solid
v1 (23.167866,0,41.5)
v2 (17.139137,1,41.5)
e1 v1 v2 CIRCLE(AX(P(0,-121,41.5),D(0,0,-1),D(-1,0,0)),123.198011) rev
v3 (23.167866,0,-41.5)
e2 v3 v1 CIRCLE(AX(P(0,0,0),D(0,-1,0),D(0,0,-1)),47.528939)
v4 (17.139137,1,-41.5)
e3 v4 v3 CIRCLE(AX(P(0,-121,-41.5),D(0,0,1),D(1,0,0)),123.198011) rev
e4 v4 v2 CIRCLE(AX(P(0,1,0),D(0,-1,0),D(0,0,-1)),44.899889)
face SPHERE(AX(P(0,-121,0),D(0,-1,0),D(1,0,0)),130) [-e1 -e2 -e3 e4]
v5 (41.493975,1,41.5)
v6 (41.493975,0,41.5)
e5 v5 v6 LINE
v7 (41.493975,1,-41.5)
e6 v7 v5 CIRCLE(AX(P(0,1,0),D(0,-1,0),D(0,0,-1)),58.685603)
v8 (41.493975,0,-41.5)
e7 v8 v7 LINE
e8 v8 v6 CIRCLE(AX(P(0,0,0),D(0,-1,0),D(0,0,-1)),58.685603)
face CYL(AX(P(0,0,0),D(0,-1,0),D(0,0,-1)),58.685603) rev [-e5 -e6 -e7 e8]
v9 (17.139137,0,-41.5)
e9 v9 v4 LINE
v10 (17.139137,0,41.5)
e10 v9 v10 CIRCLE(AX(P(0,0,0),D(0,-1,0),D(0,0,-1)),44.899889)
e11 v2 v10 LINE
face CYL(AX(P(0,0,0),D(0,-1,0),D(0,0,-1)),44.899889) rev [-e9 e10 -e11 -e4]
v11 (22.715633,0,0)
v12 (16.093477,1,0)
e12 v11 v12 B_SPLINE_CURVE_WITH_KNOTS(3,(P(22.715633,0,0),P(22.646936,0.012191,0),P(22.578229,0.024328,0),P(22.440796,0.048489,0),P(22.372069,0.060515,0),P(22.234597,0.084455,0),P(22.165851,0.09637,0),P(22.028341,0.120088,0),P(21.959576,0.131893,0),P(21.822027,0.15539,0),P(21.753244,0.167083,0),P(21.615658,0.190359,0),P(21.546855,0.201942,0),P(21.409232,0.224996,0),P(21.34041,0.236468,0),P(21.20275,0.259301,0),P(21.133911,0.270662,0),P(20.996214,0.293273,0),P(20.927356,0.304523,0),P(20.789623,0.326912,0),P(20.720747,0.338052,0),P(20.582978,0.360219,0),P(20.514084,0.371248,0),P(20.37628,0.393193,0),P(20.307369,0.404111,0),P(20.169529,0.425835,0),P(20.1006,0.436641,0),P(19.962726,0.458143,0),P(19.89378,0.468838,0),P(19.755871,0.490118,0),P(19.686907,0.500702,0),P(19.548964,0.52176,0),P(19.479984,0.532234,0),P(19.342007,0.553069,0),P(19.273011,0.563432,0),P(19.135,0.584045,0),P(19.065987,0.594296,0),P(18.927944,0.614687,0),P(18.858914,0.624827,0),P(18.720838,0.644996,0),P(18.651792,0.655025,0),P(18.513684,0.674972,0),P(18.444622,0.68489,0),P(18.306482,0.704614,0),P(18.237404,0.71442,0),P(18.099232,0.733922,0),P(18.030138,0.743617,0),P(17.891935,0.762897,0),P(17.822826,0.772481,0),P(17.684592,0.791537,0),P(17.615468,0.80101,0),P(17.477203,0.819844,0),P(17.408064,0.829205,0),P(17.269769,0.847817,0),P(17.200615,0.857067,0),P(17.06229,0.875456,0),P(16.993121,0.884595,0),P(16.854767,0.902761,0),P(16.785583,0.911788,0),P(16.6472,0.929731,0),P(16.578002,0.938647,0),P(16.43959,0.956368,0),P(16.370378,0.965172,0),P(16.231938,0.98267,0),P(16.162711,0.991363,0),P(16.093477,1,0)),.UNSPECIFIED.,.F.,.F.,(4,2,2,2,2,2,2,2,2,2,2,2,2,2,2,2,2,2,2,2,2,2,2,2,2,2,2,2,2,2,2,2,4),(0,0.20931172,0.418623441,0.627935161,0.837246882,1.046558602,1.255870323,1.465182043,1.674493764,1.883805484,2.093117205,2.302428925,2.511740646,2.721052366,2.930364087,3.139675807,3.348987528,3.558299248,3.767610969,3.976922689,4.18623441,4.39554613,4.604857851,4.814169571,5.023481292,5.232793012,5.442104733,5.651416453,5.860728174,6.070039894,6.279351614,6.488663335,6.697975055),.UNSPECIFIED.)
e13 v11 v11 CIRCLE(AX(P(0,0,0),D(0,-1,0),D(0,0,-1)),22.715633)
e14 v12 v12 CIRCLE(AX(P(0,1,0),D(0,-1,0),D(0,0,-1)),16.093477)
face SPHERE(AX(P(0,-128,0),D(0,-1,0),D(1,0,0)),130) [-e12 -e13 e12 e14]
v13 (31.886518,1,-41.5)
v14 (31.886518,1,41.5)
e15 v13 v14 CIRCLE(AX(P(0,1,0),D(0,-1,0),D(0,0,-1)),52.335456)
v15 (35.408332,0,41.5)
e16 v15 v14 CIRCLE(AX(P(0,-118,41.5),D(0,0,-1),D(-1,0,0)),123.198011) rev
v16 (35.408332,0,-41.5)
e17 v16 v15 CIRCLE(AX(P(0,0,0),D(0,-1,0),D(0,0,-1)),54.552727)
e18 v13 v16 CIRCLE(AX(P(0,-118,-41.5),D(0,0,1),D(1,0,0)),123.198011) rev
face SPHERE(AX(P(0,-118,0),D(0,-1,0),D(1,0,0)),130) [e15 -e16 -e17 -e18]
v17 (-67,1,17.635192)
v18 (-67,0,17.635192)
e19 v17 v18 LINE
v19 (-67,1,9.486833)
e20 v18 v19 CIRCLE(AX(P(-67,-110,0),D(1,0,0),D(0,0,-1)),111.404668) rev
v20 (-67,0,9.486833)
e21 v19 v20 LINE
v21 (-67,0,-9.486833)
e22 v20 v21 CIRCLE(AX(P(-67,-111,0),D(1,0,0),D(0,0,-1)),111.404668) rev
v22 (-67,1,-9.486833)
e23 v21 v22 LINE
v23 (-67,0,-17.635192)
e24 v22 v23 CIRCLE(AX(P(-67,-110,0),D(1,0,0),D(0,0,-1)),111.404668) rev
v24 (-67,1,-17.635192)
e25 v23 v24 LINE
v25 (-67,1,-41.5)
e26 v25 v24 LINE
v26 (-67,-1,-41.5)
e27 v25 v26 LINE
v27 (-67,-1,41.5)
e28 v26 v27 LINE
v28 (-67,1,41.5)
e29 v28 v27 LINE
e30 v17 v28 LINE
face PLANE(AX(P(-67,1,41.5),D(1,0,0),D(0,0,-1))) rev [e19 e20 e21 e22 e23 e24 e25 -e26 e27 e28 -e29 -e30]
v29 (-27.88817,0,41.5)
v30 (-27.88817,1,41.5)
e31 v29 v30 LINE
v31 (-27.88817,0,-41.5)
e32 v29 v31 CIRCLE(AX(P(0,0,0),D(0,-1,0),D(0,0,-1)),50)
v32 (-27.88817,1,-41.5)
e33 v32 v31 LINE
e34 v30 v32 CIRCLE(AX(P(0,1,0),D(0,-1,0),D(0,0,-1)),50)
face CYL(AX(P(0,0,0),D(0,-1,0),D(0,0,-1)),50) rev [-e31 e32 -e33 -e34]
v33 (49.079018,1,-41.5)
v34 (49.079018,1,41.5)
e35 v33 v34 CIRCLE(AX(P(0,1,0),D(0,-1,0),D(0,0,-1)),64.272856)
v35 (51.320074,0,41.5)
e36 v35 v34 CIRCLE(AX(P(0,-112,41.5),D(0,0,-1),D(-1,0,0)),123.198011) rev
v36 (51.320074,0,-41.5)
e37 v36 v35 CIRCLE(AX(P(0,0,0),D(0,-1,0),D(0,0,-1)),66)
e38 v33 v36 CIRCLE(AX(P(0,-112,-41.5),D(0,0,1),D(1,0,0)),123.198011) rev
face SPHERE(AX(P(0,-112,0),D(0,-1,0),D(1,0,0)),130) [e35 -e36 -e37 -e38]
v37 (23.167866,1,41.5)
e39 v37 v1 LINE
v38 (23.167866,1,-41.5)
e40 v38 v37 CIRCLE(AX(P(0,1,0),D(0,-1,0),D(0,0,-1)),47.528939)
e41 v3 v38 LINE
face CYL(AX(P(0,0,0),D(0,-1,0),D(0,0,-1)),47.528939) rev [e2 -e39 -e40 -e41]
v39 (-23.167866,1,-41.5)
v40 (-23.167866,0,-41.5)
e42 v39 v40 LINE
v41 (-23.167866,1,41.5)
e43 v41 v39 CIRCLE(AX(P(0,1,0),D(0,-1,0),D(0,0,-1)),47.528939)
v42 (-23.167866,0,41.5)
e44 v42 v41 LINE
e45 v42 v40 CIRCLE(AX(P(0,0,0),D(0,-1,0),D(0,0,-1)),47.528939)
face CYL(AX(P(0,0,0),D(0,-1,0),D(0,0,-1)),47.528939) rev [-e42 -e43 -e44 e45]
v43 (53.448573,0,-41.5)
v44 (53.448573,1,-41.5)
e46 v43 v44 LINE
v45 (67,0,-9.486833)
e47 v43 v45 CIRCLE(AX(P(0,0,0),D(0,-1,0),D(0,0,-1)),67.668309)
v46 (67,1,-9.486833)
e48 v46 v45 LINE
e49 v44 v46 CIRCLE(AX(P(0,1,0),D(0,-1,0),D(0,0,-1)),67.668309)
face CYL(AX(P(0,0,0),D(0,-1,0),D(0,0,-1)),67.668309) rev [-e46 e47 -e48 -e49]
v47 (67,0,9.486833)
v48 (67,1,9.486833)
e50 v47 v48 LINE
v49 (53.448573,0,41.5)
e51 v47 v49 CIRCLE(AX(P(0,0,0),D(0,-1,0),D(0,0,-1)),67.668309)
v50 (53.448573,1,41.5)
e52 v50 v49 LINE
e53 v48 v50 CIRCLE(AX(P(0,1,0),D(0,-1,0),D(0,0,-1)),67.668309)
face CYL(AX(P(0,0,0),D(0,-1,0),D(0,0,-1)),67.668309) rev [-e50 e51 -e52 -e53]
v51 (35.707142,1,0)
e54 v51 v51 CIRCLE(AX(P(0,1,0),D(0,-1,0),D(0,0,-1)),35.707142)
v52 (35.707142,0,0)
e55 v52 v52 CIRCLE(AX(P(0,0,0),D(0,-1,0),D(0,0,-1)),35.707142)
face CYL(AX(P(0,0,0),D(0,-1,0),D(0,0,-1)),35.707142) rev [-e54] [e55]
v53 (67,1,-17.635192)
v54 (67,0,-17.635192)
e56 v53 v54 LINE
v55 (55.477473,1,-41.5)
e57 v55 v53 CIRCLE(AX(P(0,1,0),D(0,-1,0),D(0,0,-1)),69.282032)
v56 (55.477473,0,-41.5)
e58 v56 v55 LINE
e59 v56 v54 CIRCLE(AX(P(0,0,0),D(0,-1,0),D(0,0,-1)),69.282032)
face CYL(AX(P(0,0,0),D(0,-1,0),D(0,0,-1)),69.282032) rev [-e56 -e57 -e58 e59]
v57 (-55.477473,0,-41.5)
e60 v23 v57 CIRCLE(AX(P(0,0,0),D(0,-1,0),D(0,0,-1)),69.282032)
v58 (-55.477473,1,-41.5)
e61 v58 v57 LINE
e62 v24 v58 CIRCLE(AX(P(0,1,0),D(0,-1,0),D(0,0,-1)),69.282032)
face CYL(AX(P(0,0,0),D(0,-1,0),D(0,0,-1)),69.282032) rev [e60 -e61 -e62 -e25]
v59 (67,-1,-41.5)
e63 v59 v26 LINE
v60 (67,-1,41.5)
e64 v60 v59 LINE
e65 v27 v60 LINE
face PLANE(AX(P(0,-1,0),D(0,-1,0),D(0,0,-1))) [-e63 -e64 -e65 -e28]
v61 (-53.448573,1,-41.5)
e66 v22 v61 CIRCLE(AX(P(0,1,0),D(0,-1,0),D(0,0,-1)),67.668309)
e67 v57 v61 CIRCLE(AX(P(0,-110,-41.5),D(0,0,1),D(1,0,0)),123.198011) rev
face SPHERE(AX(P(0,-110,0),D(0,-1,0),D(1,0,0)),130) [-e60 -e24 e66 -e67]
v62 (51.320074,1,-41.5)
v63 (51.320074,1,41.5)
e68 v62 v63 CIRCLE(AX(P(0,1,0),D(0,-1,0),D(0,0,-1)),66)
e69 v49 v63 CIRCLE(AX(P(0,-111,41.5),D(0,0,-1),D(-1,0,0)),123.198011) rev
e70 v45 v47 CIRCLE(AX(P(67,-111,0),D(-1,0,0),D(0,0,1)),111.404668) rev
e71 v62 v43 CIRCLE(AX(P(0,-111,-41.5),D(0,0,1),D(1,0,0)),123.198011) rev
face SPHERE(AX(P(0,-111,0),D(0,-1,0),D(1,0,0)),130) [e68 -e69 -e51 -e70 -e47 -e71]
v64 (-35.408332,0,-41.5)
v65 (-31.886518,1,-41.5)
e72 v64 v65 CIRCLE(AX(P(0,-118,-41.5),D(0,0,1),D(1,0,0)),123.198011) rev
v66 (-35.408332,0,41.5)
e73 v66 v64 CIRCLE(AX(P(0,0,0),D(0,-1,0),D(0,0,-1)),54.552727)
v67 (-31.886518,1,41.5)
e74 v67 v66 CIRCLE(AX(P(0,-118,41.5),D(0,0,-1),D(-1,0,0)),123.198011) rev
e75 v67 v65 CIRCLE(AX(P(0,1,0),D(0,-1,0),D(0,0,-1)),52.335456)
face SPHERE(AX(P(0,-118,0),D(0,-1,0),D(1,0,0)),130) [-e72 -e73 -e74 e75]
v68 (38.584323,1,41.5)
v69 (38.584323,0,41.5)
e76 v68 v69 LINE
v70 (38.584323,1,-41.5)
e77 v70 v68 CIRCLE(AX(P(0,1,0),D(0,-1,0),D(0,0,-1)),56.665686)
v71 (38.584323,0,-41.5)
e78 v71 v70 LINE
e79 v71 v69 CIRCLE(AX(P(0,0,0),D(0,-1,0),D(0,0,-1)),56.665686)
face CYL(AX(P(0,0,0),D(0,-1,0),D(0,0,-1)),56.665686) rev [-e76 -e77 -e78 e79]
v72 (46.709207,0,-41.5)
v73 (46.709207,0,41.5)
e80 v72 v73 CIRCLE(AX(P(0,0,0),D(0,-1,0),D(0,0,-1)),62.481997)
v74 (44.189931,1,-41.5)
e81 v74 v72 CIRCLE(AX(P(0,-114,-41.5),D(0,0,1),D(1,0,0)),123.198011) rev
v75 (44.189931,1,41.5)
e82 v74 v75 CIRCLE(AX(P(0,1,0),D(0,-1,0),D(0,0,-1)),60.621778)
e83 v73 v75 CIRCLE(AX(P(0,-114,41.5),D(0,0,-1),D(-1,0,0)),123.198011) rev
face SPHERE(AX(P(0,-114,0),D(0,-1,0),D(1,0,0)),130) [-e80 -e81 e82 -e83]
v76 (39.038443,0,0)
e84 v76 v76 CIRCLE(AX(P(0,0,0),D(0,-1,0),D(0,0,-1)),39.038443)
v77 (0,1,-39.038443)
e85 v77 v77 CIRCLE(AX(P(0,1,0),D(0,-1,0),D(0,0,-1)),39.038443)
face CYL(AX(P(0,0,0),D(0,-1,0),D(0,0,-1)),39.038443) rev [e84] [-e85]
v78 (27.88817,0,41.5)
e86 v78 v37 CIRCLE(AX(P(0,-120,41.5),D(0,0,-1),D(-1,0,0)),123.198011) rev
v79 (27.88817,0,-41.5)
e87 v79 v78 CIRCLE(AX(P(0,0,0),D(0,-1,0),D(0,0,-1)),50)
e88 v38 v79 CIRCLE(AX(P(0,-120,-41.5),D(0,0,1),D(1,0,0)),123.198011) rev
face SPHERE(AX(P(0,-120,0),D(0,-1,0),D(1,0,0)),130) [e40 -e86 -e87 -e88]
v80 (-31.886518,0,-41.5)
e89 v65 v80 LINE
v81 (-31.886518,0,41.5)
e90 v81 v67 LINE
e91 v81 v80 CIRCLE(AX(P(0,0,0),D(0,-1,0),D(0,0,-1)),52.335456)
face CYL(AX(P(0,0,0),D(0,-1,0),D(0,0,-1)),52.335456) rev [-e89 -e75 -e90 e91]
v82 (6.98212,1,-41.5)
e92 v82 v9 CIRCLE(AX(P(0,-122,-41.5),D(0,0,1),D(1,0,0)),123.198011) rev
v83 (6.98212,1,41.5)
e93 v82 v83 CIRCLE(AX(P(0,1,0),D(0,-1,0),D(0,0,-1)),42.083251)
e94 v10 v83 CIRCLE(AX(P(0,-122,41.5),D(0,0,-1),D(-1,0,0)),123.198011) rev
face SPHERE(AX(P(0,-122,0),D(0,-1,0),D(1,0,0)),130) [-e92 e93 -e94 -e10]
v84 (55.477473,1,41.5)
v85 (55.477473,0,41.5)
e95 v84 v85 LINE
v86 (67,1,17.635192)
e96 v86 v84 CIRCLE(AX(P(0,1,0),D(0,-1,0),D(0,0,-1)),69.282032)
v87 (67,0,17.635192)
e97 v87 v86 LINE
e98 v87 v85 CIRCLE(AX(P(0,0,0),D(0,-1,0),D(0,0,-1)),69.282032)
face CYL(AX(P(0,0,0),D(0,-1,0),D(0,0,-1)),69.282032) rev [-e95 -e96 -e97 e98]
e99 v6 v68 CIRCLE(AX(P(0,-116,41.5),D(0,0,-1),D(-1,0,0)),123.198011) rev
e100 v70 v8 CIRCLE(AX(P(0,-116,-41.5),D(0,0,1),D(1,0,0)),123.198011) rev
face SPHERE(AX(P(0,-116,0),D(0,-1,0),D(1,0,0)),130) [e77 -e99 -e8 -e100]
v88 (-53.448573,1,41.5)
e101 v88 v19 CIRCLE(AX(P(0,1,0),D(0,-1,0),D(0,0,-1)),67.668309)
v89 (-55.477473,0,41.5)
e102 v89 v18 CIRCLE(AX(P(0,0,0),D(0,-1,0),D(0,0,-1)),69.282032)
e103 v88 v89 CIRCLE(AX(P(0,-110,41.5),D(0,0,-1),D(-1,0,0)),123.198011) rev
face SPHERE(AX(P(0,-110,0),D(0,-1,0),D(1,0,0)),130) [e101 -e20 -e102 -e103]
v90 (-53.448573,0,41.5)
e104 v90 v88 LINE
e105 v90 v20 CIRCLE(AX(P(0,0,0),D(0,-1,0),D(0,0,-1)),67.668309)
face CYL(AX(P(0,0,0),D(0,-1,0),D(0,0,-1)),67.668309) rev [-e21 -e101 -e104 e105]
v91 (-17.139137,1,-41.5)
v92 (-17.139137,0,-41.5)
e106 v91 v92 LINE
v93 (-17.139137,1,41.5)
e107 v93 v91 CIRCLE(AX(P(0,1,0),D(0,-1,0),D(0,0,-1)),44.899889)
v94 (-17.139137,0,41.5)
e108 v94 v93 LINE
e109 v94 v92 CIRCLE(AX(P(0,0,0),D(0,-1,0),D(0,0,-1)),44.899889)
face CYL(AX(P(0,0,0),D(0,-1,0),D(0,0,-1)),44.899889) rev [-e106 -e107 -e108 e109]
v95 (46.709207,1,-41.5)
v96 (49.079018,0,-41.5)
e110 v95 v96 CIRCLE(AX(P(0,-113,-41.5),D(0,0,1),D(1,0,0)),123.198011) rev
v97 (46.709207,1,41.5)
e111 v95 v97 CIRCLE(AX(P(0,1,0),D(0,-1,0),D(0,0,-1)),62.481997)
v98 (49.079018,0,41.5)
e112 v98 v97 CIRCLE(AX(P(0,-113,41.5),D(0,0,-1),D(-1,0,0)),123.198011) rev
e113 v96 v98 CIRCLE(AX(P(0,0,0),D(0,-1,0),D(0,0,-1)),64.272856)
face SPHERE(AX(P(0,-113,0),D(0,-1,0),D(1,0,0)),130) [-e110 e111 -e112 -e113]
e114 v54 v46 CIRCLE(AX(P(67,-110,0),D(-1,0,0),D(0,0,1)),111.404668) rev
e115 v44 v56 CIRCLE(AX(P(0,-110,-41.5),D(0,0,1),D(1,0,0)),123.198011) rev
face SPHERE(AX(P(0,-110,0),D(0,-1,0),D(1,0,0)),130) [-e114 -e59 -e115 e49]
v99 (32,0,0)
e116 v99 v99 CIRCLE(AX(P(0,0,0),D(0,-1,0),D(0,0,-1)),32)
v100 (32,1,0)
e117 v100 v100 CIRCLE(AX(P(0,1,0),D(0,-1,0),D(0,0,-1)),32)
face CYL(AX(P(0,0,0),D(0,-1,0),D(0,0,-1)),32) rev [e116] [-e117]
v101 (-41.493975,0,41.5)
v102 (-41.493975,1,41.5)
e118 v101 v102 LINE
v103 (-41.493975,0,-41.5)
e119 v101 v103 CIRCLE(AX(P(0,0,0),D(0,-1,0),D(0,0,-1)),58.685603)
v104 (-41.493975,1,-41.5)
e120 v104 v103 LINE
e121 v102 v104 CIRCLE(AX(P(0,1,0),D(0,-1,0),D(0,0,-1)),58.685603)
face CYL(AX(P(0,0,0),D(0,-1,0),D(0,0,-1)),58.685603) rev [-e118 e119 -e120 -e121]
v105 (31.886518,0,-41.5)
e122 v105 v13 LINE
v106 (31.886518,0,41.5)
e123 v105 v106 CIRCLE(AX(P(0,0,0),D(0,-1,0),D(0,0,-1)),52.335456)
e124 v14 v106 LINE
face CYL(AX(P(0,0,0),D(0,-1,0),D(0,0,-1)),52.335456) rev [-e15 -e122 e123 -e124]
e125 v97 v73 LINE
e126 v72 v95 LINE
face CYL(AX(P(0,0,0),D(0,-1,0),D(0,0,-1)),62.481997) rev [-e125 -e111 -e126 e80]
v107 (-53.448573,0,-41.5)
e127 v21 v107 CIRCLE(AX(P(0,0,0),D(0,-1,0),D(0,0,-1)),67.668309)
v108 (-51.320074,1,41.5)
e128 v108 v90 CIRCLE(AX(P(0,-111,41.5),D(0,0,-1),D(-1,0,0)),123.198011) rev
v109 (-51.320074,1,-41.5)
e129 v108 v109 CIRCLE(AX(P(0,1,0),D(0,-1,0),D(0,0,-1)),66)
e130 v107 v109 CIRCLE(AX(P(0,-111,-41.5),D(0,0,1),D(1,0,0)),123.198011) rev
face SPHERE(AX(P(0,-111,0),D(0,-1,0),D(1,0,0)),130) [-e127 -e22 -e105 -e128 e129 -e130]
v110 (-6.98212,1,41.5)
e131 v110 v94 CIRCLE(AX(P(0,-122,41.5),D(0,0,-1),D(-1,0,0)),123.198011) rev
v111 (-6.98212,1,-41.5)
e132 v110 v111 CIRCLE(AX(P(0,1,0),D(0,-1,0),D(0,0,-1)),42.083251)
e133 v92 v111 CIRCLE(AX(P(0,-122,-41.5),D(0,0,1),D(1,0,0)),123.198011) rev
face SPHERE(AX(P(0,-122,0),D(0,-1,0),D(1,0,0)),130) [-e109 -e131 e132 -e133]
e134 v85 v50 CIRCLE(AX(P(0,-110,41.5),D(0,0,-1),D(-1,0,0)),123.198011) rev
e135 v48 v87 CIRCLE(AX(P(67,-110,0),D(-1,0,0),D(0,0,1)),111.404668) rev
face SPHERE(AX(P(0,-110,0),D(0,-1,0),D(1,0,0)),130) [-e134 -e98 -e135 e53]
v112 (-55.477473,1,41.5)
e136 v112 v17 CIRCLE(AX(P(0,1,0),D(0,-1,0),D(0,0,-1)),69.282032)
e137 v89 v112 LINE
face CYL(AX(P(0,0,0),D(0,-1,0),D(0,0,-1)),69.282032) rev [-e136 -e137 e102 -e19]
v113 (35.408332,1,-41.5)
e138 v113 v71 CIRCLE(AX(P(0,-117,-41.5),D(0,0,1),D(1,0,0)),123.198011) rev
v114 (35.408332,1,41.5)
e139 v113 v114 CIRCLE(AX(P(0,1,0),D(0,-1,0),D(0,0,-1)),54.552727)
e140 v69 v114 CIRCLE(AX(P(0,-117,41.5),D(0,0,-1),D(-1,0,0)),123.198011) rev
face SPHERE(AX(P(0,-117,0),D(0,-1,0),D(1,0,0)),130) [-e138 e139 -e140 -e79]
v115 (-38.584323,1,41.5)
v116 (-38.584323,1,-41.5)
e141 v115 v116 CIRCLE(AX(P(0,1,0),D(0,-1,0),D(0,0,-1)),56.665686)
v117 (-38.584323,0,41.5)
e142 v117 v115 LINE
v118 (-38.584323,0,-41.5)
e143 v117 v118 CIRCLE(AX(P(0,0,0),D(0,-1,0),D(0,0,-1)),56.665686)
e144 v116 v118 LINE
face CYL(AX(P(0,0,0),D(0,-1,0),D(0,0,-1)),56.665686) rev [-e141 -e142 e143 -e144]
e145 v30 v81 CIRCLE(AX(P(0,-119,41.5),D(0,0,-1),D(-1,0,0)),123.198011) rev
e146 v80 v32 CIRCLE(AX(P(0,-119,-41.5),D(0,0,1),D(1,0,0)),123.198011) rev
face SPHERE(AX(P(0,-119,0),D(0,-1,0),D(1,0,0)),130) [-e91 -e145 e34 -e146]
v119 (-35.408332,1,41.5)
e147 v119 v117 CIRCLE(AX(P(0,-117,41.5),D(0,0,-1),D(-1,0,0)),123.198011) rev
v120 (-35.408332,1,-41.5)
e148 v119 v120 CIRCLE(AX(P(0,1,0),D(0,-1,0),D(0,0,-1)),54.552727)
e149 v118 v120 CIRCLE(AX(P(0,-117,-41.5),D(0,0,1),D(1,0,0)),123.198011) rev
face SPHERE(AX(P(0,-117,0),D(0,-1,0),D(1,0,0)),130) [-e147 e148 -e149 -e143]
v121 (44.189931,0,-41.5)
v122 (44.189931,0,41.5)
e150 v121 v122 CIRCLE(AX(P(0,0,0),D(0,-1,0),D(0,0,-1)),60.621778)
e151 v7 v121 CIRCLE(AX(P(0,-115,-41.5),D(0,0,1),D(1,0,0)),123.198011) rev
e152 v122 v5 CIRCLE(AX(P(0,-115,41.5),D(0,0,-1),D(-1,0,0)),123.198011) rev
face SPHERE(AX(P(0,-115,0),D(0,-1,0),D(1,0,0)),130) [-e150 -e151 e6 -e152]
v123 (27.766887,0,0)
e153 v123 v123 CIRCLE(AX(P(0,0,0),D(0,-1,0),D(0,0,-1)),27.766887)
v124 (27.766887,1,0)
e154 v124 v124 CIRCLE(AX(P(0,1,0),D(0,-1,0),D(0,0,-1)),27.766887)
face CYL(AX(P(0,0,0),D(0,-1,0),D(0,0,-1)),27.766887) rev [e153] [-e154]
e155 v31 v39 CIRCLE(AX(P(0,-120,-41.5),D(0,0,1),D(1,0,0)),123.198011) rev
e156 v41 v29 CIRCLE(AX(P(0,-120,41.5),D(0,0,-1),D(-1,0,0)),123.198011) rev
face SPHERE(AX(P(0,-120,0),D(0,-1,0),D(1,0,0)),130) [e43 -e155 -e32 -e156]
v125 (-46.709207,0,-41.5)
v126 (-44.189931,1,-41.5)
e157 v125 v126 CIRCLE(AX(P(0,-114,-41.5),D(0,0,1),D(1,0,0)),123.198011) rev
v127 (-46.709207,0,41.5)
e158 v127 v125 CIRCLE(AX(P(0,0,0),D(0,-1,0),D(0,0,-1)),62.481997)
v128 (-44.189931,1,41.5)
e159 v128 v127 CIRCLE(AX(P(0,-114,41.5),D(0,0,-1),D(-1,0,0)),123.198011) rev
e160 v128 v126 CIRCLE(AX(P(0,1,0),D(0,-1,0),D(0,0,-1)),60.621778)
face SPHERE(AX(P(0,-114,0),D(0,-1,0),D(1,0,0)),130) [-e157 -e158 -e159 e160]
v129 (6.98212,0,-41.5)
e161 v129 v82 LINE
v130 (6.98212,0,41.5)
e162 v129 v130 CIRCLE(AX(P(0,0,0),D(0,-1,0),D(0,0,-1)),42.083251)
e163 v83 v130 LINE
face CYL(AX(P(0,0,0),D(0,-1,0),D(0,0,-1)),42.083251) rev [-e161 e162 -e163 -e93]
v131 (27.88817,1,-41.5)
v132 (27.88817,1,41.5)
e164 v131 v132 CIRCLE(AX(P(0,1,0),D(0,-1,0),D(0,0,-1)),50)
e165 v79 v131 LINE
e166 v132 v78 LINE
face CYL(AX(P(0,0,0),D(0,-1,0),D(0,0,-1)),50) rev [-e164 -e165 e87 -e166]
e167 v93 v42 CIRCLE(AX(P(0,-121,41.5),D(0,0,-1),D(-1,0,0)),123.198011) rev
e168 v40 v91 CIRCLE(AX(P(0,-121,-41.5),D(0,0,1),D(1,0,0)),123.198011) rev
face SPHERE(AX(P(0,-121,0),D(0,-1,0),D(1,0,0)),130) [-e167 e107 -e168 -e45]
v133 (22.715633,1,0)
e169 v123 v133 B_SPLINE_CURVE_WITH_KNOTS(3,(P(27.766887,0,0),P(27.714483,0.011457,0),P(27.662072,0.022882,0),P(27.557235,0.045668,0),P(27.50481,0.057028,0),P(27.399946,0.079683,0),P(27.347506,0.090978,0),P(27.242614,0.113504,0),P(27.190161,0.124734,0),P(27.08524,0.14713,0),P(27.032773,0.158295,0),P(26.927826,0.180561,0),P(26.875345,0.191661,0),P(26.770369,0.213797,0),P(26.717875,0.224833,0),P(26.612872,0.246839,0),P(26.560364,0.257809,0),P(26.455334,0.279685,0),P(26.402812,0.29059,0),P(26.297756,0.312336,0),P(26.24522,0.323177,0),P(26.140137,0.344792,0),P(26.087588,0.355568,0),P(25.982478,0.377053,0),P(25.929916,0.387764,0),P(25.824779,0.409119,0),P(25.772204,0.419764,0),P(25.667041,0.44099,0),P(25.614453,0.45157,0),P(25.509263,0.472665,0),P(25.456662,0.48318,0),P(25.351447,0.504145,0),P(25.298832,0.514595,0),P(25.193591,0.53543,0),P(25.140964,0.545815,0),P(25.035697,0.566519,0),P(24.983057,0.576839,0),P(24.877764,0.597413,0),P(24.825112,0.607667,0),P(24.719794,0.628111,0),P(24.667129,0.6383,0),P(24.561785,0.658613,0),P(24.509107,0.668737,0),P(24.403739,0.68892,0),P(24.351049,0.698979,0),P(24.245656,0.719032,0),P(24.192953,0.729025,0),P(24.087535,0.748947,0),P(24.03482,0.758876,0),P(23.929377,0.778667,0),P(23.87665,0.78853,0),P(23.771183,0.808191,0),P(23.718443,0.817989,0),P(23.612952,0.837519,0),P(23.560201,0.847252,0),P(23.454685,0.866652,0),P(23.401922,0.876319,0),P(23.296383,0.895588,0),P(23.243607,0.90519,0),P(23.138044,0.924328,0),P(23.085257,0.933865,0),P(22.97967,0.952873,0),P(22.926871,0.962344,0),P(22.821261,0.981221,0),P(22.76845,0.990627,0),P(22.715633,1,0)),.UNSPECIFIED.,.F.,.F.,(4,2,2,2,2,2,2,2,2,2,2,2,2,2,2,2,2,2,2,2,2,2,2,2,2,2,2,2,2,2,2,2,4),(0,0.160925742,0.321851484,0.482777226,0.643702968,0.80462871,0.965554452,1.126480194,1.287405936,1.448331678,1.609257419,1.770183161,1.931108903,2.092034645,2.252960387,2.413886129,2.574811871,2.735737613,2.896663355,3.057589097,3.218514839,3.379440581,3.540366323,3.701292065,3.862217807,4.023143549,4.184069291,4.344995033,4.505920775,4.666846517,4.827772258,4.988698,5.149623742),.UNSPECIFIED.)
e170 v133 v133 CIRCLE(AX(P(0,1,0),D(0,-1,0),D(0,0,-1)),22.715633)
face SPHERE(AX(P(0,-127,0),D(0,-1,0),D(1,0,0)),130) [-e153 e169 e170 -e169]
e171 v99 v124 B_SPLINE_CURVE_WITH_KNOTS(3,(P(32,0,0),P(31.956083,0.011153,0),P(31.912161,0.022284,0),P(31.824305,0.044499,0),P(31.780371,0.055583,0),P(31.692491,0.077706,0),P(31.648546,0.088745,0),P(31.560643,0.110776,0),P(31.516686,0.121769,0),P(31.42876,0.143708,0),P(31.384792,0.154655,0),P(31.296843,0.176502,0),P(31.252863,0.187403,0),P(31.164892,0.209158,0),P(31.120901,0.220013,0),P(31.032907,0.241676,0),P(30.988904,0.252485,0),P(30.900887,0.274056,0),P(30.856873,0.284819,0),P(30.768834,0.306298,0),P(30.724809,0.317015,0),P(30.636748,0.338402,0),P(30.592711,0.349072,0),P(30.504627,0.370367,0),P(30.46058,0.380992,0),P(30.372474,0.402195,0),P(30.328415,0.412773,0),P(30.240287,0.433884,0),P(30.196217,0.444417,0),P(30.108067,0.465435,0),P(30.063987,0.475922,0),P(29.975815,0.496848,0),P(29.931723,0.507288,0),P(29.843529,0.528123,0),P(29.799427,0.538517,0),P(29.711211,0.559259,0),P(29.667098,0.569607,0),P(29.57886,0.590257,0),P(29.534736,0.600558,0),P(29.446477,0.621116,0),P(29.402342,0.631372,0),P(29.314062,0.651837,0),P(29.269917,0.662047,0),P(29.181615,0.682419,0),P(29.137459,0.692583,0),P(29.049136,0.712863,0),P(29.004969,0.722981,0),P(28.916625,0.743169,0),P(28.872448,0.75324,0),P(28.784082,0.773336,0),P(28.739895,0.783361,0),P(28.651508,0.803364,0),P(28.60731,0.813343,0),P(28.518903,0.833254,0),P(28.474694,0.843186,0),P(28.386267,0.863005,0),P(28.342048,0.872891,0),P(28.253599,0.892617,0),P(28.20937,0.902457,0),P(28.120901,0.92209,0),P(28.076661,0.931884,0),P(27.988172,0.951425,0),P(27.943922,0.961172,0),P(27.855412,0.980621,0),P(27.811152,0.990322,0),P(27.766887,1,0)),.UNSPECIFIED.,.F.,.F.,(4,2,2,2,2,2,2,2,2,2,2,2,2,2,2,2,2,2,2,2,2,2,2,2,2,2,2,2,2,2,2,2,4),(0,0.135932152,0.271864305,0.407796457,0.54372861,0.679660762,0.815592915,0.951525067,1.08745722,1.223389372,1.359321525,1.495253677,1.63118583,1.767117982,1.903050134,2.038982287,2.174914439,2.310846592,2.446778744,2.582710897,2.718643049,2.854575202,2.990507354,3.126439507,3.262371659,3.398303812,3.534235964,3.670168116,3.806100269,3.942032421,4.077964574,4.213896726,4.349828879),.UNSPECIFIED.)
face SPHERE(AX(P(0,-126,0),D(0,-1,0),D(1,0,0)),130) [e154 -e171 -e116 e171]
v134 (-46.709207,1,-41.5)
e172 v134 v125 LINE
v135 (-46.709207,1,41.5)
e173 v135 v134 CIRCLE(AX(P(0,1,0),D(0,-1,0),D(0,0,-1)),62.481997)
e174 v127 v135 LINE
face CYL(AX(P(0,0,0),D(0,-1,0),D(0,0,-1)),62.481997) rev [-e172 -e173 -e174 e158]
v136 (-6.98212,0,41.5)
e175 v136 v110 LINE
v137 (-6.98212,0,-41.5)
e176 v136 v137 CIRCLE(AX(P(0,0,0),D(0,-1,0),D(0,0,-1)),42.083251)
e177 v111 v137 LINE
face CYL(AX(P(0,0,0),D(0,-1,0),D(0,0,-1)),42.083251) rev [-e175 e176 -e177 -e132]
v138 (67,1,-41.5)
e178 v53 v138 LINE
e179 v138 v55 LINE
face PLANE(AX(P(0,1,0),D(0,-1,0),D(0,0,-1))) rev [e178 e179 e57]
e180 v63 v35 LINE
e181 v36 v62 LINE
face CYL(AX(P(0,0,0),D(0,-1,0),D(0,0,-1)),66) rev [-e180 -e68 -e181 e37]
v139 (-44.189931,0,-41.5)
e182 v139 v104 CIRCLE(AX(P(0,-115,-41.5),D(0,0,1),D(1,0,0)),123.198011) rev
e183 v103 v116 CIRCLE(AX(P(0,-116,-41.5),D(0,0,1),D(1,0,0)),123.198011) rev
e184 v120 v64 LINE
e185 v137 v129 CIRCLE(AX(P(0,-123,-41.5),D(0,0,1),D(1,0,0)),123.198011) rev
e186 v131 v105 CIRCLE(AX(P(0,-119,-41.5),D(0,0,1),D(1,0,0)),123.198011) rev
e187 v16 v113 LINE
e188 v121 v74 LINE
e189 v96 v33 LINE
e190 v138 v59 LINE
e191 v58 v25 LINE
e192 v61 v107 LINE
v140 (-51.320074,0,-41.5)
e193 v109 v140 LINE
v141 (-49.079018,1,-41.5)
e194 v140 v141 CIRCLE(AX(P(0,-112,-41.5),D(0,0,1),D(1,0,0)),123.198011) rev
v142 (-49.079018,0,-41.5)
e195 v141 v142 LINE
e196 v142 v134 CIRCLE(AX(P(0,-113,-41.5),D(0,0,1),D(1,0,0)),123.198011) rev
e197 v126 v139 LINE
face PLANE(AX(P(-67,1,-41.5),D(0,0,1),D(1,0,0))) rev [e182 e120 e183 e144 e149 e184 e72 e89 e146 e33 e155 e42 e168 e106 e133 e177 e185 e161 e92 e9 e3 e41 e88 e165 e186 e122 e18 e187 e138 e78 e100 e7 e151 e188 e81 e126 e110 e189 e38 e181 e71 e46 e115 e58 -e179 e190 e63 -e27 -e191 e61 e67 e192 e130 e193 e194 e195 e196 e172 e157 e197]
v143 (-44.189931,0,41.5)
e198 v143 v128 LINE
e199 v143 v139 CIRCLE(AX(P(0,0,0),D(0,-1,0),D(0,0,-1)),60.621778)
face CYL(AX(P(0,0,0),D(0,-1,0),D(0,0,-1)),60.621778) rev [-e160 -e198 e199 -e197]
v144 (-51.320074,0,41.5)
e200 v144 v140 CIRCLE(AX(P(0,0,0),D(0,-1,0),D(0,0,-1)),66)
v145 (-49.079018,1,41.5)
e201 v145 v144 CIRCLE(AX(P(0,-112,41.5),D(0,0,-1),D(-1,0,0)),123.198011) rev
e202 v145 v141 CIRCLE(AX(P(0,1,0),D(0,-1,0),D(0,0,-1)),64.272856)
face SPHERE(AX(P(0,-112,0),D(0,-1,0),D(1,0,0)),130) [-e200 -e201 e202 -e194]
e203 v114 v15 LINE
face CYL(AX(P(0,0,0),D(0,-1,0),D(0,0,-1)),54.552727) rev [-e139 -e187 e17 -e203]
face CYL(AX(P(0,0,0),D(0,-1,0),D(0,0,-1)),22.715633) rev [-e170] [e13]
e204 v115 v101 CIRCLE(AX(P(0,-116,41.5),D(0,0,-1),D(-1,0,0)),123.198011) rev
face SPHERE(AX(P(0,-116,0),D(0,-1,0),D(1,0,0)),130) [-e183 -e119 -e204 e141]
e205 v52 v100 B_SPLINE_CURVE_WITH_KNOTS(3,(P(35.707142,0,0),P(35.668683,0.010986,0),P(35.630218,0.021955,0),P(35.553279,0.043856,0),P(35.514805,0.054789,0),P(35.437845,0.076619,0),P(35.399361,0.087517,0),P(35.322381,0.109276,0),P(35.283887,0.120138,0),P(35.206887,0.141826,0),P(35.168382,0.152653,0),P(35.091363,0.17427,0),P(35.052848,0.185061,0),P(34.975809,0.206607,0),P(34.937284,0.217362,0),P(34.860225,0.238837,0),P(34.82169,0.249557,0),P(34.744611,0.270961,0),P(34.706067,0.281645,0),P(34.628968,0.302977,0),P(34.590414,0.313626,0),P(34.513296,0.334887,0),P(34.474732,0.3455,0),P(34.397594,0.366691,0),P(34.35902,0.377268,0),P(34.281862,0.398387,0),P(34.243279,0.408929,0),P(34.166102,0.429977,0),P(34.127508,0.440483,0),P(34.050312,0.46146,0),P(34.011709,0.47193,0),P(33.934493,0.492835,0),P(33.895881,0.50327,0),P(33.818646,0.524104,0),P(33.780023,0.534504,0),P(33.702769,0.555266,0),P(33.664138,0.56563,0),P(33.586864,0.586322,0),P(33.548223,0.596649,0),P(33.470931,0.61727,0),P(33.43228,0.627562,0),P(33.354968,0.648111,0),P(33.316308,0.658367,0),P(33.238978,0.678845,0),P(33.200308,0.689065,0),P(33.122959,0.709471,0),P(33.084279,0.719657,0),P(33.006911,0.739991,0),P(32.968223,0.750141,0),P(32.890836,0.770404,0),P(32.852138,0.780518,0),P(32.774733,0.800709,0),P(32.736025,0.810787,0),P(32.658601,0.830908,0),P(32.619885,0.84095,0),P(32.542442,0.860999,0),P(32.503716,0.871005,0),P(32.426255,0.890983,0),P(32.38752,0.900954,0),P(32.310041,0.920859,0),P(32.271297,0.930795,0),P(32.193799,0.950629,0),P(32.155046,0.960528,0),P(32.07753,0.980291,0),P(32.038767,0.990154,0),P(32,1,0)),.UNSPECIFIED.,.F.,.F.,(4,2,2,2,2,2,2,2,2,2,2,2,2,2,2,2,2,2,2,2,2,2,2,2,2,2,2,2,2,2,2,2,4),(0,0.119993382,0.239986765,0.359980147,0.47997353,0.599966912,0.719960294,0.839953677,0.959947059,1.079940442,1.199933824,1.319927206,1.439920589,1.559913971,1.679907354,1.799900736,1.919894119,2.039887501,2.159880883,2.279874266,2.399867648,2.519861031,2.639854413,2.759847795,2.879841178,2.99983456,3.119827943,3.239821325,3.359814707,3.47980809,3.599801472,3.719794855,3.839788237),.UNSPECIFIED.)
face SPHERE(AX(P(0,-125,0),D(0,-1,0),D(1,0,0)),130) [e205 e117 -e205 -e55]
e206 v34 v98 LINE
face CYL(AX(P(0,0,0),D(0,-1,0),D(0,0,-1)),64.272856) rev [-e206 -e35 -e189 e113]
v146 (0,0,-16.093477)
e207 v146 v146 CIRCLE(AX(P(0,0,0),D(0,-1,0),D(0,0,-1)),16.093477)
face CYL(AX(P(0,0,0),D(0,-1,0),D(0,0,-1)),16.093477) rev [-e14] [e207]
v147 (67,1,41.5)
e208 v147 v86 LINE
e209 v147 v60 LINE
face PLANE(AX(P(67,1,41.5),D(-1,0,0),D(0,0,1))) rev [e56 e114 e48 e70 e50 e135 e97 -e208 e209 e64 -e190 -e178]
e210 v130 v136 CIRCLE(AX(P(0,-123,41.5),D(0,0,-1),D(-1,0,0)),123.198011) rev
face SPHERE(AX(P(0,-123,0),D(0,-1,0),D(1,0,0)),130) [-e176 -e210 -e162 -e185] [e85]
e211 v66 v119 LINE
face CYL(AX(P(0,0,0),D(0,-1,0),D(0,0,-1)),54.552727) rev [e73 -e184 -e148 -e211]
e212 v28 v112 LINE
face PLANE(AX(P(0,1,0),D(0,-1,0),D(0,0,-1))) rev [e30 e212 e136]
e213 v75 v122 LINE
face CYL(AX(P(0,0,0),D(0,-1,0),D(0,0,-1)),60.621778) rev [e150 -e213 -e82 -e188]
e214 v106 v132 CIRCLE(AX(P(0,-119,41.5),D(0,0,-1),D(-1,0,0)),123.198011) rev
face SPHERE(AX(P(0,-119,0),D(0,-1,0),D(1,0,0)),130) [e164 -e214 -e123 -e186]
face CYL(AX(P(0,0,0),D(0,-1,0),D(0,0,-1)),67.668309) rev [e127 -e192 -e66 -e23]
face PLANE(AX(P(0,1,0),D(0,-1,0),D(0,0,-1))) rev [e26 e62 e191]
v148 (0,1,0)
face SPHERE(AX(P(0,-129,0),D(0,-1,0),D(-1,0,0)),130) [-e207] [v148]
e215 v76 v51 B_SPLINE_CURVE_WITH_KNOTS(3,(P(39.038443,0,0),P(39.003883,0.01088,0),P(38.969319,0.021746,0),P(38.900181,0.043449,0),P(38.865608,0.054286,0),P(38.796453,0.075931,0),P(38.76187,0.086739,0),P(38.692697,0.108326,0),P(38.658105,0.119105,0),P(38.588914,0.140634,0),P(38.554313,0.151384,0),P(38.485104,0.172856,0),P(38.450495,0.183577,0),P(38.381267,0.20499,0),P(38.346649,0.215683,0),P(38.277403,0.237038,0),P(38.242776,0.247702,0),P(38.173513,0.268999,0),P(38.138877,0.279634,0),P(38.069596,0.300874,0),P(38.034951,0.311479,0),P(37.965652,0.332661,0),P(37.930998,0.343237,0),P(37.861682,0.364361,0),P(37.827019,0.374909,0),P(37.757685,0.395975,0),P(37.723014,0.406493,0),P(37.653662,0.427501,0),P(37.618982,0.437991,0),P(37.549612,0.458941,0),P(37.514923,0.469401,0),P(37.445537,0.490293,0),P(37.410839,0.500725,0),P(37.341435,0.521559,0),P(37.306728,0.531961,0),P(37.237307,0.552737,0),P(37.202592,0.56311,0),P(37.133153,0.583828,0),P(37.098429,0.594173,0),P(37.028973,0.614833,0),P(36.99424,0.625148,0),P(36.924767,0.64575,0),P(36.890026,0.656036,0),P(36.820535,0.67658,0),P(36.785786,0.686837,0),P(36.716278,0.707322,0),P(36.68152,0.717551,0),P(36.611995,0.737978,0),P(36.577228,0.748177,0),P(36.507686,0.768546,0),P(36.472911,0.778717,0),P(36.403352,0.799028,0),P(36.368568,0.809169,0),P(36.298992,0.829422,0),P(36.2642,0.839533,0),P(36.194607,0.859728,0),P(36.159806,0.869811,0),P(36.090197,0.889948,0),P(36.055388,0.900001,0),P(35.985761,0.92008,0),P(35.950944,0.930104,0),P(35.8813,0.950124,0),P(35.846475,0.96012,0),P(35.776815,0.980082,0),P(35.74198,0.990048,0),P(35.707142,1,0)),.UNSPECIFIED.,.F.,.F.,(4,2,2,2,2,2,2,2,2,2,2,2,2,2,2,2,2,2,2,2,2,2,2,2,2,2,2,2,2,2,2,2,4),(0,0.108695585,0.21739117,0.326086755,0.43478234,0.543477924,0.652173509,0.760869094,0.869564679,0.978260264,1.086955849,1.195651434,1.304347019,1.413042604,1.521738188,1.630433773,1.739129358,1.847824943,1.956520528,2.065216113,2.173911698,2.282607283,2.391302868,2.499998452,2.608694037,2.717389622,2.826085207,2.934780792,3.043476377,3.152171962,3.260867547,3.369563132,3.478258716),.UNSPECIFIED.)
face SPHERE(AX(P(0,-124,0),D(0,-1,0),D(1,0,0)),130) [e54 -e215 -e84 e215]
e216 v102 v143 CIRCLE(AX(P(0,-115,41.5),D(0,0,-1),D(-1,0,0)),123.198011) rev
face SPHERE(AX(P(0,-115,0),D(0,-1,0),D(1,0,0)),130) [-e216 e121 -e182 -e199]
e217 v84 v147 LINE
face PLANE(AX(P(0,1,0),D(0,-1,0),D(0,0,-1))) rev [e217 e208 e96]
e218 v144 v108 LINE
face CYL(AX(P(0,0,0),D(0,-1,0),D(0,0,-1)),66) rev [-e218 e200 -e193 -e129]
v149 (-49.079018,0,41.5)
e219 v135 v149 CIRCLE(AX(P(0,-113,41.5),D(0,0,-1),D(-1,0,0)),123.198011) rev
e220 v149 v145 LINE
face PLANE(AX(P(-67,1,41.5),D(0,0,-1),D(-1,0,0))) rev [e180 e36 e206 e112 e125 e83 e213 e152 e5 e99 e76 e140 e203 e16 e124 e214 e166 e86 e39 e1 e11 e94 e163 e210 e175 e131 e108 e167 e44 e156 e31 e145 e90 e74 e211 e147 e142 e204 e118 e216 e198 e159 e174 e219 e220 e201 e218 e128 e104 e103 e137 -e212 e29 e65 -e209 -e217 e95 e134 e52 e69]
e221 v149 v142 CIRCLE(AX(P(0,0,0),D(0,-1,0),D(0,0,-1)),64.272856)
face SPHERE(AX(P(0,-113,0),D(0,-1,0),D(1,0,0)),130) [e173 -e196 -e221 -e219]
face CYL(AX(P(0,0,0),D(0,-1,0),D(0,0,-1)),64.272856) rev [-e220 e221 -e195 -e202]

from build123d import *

# Parameters (mm, degrees)
SKETCH1_W           = 134
SKETCH1_H           = 83
BOSS_EXTRUDE1_DEPTH = 1


with BuildPart() as part:
    # Sketch1 → Boss-Extrude1 (new, symmetric)
    with BuildSketch(Plane(origin=(0, 0, 0), x_dir=(1, 0, 0), z_dir=(0, 1, 0))):
        Rectangle(SKETCH1_W, SKETCH1_H)
    extrude(amount=BOSS_EXTRUDE1_DEPTH, both=True)

    # Sketch2 → Cut-Revolve2 (revolve, cut)
    with BuildSketch(Plane.XY):
        with BuildLine():
            ThreePointArc((0, 1), (8.062257748, 0.749759152), (16.093476939, 0))
            Line((16.093476939, 0), (16.093476939, 1))
            ThreePointArc((16.093476939, 1), (19.410995879, 0.542651439), (22.715633383, 0))
            Line((22.715633383, 0), (22.715633383, 1))
            ThreePointArc((22.715633383, 1), (25.246211792, 0.52501241), (27.766886754, 0))
            Line((27.766886754, 0), (27.766886754, 1))
            ThreePointArc((27.766886754, 1), (29.887626002, 0.517705527), (32, 0))
            Line((32, 0), (32, 1))
            ThreePointArc((32, 1), (33.857263243, 0.513687404), (35.707142143, 0))
            Line((35.707142143, 0), (35.707142143, 1))
            ThreePointArc((35.707142143, 1), (37.376136897, 0.511141633), (39.038442592, 0))
            Line((39.038442592, 0), (39.038442592, 1))
            ThreePointArc((39.038442592, 1), (40.563928381, 0.509383102), (42.083250825, 0))
            Line((42.083250825, 0), (42.083250825, 1))
            ThreePointArc((42.083250825, 1), (43.494443758, 0.508095088), (44.899888641, 0))
            Line((44.899888641, 0), (44.899888641, 1))
            ThreePointArc((44.899888641, 1), (46.217118302, 0.507110804), (47.528938553, 0))
            Line((47.528938553, 0), (47.528938553, 1))
            ThreePointArc((47.528938553, 1), (48.767032551, 0.506334009), (50, 0))
            Line((50, 0), (50, 1))
            ThreePointArc((50, 1), (51.170171104, 0.505705258), (52.335456433, 0))
            Line((52.335456433, 0), (52.335456433, 1))
            ThreePointArc((52.335456433, 1), (53.446430452, 0.505185844), (54.552726788, 0))
            Line((54.552726788, 0), (54.552726788, 1))
            ThreePointArc((54.552726788, 1), (55.611454311, 0.504749476), (56.665686266, 0))
            Line((56.665686266, 0), (56.665686266, 1))
            ThreePointArc((56.665686266, 1), (57.677811887, 0.504377668), (58.685603004, 0))
            Line((58.685603004, 0), (58.685603004, 1))
            ThreePointArc((58.685603004, 1), (59.655786026, 0.504057044), (60.621778265, 0))
            Line((60.621778265, 0), (60.621778265, 1))
            ThreePointArc((60.621778265, 1), (61.55391861, 0.503777684), (62.481997407, 0))
            Line((62.481997407, 0), (62.481997407, 1))
            ThreePointArc((62.481997407, 1), (63.379398912, 0.503532075), (64.272855857, 0))
            Line((64.272855857, 0), (64.272855857, 1))
            ThreePointArc((64.272855857, 1), (65.138346949, 0.503314425), (66, 0))
            Line((66, 0), (66, 1))
            ThreePointArc((66, 1), (66.836024616, 0.503120196), (67.668308683, 0))
            Line((67.668308683, 0), (67.668308683, 1))
            ThreePointArc((67.668308683, 1), (68.476995948, 0.50294578), (69.282032303, 0))
            Line((69.282032303, 0), (69.282032303, 2))
            Line((69.282032303, 2), (0, 2))
            Line((0, 2), (0, 1))
        make_face()
    revolve(axis=Axis((0, 0, 0), (0, 1, 0)), mode=Mode.SUBTRACT)


solid = part.part
